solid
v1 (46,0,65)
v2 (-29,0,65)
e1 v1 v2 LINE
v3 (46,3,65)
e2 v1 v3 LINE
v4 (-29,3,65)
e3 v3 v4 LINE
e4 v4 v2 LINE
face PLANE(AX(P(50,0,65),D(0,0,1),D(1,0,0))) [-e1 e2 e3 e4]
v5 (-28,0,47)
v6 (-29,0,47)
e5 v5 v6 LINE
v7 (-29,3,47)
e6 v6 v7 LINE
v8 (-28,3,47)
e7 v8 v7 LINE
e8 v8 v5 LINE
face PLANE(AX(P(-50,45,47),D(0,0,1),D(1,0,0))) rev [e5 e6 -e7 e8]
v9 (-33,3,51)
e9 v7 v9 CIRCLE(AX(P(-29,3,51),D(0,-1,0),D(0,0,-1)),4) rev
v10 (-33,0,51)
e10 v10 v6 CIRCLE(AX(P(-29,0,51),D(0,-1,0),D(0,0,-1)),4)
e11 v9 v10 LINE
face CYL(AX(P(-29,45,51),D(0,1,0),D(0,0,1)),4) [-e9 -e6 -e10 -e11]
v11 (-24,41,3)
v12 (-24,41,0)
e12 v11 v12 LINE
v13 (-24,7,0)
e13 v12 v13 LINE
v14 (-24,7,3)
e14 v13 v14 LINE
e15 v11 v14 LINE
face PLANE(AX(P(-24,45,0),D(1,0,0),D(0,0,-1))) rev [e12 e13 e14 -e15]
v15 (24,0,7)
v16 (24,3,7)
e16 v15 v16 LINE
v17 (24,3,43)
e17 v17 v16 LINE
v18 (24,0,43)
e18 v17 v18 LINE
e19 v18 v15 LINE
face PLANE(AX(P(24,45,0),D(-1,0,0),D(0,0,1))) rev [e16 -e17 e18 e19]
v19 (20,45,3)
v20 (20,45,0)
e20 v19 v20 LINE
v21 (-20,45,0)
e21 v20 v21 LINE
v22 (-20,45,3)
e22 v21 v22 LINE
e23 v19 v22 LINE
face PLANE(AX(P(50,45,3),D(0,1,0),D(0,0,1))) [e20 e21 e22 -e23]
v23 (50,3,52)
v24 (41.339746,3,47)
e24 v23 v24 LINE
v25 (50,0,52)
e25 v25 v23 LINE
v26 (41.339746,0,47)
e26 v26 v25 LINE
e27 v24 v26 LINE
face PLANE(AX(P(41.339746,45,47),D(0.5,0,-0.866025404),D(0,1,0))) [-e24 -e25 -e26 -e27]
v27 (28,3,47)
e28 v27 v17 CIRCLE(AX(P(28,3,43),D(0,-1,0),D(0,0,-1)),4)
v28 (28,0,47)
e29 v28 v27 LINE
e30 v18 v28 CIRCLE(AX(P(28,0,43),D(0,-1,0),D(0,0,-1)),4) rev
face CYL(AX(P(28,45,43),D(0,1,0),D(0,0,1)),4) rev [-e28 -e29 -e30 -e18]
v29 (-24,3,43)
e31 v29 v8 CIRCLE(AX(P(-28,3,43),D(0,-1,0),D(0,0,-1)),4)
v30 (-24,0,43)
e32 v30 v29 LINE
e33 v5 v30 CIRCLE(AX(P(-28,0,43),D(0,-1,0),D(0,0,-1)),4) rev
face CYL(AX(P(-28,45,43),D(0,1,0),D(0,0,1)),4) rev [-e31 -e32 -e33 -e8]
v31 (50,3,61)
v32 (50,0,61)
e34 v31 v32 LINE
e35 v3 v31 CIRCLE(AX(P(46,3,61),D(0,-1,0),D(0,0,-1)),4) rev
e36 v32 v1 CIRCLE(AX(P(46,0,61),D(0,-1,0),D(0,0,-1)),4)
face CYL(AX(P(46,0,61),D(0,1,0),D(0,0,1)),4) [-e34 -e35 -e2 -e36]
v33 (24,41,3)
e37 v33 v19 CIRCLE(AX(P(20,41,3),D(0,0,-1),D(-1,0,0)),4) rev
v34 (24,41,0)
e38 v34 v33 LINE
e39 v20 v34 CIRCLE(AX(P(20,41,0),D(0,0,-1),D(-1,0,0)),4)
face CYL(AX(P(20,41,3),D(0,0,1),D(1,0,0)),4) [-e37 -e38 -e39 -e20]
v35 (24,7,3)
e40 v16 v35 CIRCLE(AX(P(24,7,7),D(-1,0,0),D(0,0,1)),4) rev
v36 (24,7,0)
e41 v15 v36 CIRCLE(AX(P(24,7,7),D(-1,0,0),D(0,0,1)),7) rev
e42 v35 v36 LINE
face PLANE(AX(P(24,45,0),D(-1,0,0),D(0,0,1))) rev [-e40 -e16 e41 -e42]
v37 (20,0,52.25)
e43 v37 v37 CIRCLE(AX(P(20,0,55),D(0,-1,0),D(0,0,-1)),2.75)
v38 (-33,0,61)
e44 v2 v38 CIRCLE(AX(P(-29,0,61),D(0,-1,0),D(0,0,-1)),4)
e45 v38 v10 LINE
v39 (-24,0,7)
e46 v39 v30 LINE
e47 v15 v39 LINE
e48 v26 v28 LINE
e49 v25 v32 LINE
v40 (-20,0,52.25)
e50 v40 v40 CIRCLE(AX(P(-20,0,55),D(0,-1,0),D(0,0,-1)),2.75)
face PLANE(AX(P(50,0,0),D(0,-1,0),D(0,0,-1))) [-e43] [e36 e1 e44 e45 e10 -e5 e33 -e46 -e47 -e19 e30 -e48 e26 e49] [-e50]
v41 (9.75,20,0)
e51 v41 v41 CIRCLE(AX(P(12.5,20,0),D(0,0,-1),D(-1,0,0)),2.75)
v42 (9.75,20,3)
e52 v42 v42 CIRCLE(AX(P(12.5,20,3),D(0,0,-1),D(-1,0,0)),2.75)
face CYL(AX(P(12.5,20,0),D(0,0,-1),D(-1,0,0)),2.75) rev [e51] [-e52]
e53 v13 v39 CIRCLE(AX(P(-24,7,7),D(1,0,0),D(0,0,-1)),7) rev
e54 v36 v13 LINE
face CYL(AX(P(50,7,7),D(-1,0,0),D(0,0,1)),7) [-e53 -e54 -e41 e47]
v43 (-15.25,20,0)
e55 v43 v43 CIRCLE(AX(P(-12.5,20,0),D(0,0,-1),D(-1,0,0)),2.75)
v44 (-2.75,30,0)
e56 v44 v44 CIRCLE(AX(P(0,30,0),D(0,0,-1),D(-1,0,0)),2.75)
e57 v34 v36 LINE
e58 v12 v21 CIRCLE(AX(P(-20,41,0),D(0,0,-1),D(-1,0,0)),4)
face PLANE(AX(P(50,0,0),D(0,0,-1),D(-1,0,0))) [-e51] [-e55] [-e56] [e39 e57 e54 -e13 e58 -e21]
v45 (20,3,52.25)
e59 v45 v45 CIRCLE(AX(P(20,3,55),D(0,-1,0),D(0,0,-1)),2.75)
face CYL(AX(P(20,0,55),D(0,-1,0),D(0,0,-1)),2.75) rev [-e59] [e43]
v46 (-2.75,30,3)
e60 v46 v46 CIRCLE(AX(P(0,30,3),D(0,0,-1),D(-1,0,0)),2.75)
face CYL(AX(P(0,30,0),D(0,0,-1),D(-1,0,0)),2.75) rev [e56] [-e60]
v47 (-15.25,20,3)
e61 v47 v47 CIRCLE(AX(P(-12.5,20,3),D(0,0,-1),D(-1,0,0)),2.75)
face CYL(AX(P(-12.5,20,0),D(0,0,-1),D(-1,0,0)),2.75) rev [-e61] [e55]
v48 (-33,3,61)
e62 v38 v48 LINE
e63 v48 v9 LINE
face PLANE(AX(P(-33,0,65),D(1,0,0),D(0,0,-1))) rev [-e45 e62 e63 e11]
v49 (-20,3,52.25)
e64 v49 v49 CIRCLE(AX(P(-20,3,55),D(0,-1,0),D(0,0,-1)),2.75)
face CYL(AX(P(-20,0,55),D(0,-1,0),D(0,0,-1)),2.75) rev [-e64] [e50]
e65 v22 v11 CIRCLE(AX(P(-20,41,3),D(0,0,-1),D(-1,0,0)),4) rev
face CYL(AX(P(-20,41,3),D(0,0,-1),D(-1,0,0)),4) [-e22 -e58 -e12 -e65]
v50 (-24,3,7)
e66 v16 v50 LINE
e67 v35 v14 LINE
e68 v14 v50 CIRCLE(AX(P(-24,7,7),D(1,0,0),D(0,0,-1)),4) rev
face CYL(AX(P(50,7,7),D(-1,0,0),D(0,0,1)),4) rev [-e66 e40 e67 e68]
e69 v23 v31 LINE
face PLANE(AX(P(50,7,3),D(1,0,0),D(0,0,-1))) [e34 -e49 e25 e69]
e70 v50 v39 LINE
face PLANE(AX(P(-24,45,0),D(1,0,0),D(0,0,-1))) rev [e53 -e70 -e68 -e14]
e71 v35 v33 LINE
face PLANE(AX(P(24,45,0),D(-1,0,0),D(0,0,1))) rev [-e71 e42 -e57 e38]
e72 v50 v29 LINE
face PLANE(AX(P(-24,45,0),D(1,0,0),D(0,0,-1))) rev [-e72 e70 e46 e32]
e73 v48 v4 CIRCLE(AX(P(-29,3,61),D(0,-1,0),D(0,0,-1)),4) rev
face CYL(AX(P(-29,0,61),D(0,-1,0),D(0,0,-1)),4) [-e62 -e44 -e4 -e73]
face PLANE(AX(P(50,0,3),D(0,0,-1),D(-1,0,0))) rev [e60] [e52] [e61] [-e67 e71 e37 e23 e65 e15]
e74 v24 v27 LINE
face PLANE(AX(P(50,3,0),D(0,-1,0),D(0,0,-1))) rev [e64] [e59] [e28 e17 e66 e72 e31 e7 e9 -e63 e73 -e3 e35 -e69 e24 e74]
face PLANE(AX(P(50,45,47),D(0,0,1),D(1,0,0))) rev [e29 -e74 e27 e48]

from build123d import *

# Parameters (mm, degrees)
ODGI_CIE_BAZOWE1_DEPTH     = 50
SZKIC6_W                   = 26
SZKIC6_H                   = 47
WYTNIJ_WYCI_GNI_CIE1_DEPTH = 94.541434669
OTW_R_POD_RUB_M51_D        = 5.5
OTW_R_POD_RUB_M52_D        = 5.5
SZKIC11_W                  = 17
SZKIC11_H                  = 18
WYTNIJ_WYCI_GNI_CIE2_DEPTH = 93.135769384
SFAZOWANIE1_SIZE           = 5
SFAZOWANIE1_SIZE2          = 8.660254038
ZAOKR_GLENIE1_R            = 4


# Sheet-metal steps are written as plain solids
with BuildPart() as part:
    # Szkic1 → Odgięcie bazowe1 (new, symmetric)
    with BuildSketch(Plane(origin=(0, 0, 0), x_dir=(0, 0, -1), z_dir=(1, 0, 0))):
        with BuildLine():
            Line((-65, 0), (-7, 0))
            ThreePointArc((-7, 0), (-2.050252532, 2.050252532), (0, 7))
            Line((0, 7), (0, 45))
            Line((0, 45), (-3, 45))
            Line((-3, 45), (-3, 7))
            ThreePointArc((-3, 7), (-4.171572875, 4.171572875), (-7, 3))
            Line((-7, 3), (-65, 3))
            Line((-65, 3), (-65, 0))
        make_face()
    extrude(amount=ODGI_CIE_BAZOWE1_DEPTH, both=True)

    # Szkic6 → Wytnij-wyciągnięcie1 (cut, through all)
    with BuildSketch(Plane.XZ):
        with Locations((37, 23.5)):
            Rectangle(SZKIC6_W, SZKIC6_H)
        with Locations((-37, 23.5)):
            Rectangle(SZKIC6_W, SZKIC6_H)
    extrude(amount=-WYTNIJ_WYCI_GNI_CIE1_DEPTH, mode=Mode.SUBTRACT)

    # Otwór pod śrubę M51 (through all)
    with Locations(Plane(origin=(0, 0, 0), x_dir=(-1, 0, 0), z_dir=(0, 0, -1))):
        with Locations((0, 30), (-12.5, 20), (12.5, 20)):
            Hole(OTW_R_POD_RUB_M51_D / 2)

    # Otwór pod śrubę M52 (through all)
    with Locations(Plane(origin=(0, 0, 0), x_dir=(-1, 0, 0), z_dir=(0, -1, 0))):
        with Locations((20, -55), (-20, -55)):
            Hole(OTW_R_POD_RUB_M52_D / 2)

    # Szkic11 → Wytnij-wyciągnięcie2 (cut, through all)
    with BuildSketch(Plane(origin=(0, 3, 0), x_dir=(1, 0, 0), z_dir=(0, 1, 0))):
        with Locations((-41.5, -56)):
            Rectangle(SZKIC11_W, SZKIC11_H)
    extrude(amount=-WYTNIJ_WYCI_GNI_CIE2_DEPTH, mode=Mode.SUBTRACT)

    # Sfazowanie1
    sfazowanie1_edges = [part.edges().sort_by_distance(p)[0] for p in [
        (50, 1.5, 47),
    ]]
    sfazowanie1_side = [part.faces().sort_by_distance(p)[0] for p in [
        (50, 1.5, 56),
    ]]
    chamfer(sfazowanie1_edges, length=SFAZOWANIE1_SIZE, length2=SFAZOWANIE1_SIZE2, reference=sfazowanie1_side[0])

    # Zaokrąglenie1
    zaokr_glenie1_edges = [part.edges().sort_by_distance(p)[0] for p in [
        (-33, 1.5, 47),
        (-33, 1.5, 65),
        (-24, 45, 1.5),
        (-24, 1.5, 47),
        (24, 1.5, 47),
        (24, 45, 1.5),
        (50, 1.5, 65),
    ]]
    fillet(zaokr_glenie1_edges, radius=ZAOKR_GLENIE1_R)


solid = part.part
